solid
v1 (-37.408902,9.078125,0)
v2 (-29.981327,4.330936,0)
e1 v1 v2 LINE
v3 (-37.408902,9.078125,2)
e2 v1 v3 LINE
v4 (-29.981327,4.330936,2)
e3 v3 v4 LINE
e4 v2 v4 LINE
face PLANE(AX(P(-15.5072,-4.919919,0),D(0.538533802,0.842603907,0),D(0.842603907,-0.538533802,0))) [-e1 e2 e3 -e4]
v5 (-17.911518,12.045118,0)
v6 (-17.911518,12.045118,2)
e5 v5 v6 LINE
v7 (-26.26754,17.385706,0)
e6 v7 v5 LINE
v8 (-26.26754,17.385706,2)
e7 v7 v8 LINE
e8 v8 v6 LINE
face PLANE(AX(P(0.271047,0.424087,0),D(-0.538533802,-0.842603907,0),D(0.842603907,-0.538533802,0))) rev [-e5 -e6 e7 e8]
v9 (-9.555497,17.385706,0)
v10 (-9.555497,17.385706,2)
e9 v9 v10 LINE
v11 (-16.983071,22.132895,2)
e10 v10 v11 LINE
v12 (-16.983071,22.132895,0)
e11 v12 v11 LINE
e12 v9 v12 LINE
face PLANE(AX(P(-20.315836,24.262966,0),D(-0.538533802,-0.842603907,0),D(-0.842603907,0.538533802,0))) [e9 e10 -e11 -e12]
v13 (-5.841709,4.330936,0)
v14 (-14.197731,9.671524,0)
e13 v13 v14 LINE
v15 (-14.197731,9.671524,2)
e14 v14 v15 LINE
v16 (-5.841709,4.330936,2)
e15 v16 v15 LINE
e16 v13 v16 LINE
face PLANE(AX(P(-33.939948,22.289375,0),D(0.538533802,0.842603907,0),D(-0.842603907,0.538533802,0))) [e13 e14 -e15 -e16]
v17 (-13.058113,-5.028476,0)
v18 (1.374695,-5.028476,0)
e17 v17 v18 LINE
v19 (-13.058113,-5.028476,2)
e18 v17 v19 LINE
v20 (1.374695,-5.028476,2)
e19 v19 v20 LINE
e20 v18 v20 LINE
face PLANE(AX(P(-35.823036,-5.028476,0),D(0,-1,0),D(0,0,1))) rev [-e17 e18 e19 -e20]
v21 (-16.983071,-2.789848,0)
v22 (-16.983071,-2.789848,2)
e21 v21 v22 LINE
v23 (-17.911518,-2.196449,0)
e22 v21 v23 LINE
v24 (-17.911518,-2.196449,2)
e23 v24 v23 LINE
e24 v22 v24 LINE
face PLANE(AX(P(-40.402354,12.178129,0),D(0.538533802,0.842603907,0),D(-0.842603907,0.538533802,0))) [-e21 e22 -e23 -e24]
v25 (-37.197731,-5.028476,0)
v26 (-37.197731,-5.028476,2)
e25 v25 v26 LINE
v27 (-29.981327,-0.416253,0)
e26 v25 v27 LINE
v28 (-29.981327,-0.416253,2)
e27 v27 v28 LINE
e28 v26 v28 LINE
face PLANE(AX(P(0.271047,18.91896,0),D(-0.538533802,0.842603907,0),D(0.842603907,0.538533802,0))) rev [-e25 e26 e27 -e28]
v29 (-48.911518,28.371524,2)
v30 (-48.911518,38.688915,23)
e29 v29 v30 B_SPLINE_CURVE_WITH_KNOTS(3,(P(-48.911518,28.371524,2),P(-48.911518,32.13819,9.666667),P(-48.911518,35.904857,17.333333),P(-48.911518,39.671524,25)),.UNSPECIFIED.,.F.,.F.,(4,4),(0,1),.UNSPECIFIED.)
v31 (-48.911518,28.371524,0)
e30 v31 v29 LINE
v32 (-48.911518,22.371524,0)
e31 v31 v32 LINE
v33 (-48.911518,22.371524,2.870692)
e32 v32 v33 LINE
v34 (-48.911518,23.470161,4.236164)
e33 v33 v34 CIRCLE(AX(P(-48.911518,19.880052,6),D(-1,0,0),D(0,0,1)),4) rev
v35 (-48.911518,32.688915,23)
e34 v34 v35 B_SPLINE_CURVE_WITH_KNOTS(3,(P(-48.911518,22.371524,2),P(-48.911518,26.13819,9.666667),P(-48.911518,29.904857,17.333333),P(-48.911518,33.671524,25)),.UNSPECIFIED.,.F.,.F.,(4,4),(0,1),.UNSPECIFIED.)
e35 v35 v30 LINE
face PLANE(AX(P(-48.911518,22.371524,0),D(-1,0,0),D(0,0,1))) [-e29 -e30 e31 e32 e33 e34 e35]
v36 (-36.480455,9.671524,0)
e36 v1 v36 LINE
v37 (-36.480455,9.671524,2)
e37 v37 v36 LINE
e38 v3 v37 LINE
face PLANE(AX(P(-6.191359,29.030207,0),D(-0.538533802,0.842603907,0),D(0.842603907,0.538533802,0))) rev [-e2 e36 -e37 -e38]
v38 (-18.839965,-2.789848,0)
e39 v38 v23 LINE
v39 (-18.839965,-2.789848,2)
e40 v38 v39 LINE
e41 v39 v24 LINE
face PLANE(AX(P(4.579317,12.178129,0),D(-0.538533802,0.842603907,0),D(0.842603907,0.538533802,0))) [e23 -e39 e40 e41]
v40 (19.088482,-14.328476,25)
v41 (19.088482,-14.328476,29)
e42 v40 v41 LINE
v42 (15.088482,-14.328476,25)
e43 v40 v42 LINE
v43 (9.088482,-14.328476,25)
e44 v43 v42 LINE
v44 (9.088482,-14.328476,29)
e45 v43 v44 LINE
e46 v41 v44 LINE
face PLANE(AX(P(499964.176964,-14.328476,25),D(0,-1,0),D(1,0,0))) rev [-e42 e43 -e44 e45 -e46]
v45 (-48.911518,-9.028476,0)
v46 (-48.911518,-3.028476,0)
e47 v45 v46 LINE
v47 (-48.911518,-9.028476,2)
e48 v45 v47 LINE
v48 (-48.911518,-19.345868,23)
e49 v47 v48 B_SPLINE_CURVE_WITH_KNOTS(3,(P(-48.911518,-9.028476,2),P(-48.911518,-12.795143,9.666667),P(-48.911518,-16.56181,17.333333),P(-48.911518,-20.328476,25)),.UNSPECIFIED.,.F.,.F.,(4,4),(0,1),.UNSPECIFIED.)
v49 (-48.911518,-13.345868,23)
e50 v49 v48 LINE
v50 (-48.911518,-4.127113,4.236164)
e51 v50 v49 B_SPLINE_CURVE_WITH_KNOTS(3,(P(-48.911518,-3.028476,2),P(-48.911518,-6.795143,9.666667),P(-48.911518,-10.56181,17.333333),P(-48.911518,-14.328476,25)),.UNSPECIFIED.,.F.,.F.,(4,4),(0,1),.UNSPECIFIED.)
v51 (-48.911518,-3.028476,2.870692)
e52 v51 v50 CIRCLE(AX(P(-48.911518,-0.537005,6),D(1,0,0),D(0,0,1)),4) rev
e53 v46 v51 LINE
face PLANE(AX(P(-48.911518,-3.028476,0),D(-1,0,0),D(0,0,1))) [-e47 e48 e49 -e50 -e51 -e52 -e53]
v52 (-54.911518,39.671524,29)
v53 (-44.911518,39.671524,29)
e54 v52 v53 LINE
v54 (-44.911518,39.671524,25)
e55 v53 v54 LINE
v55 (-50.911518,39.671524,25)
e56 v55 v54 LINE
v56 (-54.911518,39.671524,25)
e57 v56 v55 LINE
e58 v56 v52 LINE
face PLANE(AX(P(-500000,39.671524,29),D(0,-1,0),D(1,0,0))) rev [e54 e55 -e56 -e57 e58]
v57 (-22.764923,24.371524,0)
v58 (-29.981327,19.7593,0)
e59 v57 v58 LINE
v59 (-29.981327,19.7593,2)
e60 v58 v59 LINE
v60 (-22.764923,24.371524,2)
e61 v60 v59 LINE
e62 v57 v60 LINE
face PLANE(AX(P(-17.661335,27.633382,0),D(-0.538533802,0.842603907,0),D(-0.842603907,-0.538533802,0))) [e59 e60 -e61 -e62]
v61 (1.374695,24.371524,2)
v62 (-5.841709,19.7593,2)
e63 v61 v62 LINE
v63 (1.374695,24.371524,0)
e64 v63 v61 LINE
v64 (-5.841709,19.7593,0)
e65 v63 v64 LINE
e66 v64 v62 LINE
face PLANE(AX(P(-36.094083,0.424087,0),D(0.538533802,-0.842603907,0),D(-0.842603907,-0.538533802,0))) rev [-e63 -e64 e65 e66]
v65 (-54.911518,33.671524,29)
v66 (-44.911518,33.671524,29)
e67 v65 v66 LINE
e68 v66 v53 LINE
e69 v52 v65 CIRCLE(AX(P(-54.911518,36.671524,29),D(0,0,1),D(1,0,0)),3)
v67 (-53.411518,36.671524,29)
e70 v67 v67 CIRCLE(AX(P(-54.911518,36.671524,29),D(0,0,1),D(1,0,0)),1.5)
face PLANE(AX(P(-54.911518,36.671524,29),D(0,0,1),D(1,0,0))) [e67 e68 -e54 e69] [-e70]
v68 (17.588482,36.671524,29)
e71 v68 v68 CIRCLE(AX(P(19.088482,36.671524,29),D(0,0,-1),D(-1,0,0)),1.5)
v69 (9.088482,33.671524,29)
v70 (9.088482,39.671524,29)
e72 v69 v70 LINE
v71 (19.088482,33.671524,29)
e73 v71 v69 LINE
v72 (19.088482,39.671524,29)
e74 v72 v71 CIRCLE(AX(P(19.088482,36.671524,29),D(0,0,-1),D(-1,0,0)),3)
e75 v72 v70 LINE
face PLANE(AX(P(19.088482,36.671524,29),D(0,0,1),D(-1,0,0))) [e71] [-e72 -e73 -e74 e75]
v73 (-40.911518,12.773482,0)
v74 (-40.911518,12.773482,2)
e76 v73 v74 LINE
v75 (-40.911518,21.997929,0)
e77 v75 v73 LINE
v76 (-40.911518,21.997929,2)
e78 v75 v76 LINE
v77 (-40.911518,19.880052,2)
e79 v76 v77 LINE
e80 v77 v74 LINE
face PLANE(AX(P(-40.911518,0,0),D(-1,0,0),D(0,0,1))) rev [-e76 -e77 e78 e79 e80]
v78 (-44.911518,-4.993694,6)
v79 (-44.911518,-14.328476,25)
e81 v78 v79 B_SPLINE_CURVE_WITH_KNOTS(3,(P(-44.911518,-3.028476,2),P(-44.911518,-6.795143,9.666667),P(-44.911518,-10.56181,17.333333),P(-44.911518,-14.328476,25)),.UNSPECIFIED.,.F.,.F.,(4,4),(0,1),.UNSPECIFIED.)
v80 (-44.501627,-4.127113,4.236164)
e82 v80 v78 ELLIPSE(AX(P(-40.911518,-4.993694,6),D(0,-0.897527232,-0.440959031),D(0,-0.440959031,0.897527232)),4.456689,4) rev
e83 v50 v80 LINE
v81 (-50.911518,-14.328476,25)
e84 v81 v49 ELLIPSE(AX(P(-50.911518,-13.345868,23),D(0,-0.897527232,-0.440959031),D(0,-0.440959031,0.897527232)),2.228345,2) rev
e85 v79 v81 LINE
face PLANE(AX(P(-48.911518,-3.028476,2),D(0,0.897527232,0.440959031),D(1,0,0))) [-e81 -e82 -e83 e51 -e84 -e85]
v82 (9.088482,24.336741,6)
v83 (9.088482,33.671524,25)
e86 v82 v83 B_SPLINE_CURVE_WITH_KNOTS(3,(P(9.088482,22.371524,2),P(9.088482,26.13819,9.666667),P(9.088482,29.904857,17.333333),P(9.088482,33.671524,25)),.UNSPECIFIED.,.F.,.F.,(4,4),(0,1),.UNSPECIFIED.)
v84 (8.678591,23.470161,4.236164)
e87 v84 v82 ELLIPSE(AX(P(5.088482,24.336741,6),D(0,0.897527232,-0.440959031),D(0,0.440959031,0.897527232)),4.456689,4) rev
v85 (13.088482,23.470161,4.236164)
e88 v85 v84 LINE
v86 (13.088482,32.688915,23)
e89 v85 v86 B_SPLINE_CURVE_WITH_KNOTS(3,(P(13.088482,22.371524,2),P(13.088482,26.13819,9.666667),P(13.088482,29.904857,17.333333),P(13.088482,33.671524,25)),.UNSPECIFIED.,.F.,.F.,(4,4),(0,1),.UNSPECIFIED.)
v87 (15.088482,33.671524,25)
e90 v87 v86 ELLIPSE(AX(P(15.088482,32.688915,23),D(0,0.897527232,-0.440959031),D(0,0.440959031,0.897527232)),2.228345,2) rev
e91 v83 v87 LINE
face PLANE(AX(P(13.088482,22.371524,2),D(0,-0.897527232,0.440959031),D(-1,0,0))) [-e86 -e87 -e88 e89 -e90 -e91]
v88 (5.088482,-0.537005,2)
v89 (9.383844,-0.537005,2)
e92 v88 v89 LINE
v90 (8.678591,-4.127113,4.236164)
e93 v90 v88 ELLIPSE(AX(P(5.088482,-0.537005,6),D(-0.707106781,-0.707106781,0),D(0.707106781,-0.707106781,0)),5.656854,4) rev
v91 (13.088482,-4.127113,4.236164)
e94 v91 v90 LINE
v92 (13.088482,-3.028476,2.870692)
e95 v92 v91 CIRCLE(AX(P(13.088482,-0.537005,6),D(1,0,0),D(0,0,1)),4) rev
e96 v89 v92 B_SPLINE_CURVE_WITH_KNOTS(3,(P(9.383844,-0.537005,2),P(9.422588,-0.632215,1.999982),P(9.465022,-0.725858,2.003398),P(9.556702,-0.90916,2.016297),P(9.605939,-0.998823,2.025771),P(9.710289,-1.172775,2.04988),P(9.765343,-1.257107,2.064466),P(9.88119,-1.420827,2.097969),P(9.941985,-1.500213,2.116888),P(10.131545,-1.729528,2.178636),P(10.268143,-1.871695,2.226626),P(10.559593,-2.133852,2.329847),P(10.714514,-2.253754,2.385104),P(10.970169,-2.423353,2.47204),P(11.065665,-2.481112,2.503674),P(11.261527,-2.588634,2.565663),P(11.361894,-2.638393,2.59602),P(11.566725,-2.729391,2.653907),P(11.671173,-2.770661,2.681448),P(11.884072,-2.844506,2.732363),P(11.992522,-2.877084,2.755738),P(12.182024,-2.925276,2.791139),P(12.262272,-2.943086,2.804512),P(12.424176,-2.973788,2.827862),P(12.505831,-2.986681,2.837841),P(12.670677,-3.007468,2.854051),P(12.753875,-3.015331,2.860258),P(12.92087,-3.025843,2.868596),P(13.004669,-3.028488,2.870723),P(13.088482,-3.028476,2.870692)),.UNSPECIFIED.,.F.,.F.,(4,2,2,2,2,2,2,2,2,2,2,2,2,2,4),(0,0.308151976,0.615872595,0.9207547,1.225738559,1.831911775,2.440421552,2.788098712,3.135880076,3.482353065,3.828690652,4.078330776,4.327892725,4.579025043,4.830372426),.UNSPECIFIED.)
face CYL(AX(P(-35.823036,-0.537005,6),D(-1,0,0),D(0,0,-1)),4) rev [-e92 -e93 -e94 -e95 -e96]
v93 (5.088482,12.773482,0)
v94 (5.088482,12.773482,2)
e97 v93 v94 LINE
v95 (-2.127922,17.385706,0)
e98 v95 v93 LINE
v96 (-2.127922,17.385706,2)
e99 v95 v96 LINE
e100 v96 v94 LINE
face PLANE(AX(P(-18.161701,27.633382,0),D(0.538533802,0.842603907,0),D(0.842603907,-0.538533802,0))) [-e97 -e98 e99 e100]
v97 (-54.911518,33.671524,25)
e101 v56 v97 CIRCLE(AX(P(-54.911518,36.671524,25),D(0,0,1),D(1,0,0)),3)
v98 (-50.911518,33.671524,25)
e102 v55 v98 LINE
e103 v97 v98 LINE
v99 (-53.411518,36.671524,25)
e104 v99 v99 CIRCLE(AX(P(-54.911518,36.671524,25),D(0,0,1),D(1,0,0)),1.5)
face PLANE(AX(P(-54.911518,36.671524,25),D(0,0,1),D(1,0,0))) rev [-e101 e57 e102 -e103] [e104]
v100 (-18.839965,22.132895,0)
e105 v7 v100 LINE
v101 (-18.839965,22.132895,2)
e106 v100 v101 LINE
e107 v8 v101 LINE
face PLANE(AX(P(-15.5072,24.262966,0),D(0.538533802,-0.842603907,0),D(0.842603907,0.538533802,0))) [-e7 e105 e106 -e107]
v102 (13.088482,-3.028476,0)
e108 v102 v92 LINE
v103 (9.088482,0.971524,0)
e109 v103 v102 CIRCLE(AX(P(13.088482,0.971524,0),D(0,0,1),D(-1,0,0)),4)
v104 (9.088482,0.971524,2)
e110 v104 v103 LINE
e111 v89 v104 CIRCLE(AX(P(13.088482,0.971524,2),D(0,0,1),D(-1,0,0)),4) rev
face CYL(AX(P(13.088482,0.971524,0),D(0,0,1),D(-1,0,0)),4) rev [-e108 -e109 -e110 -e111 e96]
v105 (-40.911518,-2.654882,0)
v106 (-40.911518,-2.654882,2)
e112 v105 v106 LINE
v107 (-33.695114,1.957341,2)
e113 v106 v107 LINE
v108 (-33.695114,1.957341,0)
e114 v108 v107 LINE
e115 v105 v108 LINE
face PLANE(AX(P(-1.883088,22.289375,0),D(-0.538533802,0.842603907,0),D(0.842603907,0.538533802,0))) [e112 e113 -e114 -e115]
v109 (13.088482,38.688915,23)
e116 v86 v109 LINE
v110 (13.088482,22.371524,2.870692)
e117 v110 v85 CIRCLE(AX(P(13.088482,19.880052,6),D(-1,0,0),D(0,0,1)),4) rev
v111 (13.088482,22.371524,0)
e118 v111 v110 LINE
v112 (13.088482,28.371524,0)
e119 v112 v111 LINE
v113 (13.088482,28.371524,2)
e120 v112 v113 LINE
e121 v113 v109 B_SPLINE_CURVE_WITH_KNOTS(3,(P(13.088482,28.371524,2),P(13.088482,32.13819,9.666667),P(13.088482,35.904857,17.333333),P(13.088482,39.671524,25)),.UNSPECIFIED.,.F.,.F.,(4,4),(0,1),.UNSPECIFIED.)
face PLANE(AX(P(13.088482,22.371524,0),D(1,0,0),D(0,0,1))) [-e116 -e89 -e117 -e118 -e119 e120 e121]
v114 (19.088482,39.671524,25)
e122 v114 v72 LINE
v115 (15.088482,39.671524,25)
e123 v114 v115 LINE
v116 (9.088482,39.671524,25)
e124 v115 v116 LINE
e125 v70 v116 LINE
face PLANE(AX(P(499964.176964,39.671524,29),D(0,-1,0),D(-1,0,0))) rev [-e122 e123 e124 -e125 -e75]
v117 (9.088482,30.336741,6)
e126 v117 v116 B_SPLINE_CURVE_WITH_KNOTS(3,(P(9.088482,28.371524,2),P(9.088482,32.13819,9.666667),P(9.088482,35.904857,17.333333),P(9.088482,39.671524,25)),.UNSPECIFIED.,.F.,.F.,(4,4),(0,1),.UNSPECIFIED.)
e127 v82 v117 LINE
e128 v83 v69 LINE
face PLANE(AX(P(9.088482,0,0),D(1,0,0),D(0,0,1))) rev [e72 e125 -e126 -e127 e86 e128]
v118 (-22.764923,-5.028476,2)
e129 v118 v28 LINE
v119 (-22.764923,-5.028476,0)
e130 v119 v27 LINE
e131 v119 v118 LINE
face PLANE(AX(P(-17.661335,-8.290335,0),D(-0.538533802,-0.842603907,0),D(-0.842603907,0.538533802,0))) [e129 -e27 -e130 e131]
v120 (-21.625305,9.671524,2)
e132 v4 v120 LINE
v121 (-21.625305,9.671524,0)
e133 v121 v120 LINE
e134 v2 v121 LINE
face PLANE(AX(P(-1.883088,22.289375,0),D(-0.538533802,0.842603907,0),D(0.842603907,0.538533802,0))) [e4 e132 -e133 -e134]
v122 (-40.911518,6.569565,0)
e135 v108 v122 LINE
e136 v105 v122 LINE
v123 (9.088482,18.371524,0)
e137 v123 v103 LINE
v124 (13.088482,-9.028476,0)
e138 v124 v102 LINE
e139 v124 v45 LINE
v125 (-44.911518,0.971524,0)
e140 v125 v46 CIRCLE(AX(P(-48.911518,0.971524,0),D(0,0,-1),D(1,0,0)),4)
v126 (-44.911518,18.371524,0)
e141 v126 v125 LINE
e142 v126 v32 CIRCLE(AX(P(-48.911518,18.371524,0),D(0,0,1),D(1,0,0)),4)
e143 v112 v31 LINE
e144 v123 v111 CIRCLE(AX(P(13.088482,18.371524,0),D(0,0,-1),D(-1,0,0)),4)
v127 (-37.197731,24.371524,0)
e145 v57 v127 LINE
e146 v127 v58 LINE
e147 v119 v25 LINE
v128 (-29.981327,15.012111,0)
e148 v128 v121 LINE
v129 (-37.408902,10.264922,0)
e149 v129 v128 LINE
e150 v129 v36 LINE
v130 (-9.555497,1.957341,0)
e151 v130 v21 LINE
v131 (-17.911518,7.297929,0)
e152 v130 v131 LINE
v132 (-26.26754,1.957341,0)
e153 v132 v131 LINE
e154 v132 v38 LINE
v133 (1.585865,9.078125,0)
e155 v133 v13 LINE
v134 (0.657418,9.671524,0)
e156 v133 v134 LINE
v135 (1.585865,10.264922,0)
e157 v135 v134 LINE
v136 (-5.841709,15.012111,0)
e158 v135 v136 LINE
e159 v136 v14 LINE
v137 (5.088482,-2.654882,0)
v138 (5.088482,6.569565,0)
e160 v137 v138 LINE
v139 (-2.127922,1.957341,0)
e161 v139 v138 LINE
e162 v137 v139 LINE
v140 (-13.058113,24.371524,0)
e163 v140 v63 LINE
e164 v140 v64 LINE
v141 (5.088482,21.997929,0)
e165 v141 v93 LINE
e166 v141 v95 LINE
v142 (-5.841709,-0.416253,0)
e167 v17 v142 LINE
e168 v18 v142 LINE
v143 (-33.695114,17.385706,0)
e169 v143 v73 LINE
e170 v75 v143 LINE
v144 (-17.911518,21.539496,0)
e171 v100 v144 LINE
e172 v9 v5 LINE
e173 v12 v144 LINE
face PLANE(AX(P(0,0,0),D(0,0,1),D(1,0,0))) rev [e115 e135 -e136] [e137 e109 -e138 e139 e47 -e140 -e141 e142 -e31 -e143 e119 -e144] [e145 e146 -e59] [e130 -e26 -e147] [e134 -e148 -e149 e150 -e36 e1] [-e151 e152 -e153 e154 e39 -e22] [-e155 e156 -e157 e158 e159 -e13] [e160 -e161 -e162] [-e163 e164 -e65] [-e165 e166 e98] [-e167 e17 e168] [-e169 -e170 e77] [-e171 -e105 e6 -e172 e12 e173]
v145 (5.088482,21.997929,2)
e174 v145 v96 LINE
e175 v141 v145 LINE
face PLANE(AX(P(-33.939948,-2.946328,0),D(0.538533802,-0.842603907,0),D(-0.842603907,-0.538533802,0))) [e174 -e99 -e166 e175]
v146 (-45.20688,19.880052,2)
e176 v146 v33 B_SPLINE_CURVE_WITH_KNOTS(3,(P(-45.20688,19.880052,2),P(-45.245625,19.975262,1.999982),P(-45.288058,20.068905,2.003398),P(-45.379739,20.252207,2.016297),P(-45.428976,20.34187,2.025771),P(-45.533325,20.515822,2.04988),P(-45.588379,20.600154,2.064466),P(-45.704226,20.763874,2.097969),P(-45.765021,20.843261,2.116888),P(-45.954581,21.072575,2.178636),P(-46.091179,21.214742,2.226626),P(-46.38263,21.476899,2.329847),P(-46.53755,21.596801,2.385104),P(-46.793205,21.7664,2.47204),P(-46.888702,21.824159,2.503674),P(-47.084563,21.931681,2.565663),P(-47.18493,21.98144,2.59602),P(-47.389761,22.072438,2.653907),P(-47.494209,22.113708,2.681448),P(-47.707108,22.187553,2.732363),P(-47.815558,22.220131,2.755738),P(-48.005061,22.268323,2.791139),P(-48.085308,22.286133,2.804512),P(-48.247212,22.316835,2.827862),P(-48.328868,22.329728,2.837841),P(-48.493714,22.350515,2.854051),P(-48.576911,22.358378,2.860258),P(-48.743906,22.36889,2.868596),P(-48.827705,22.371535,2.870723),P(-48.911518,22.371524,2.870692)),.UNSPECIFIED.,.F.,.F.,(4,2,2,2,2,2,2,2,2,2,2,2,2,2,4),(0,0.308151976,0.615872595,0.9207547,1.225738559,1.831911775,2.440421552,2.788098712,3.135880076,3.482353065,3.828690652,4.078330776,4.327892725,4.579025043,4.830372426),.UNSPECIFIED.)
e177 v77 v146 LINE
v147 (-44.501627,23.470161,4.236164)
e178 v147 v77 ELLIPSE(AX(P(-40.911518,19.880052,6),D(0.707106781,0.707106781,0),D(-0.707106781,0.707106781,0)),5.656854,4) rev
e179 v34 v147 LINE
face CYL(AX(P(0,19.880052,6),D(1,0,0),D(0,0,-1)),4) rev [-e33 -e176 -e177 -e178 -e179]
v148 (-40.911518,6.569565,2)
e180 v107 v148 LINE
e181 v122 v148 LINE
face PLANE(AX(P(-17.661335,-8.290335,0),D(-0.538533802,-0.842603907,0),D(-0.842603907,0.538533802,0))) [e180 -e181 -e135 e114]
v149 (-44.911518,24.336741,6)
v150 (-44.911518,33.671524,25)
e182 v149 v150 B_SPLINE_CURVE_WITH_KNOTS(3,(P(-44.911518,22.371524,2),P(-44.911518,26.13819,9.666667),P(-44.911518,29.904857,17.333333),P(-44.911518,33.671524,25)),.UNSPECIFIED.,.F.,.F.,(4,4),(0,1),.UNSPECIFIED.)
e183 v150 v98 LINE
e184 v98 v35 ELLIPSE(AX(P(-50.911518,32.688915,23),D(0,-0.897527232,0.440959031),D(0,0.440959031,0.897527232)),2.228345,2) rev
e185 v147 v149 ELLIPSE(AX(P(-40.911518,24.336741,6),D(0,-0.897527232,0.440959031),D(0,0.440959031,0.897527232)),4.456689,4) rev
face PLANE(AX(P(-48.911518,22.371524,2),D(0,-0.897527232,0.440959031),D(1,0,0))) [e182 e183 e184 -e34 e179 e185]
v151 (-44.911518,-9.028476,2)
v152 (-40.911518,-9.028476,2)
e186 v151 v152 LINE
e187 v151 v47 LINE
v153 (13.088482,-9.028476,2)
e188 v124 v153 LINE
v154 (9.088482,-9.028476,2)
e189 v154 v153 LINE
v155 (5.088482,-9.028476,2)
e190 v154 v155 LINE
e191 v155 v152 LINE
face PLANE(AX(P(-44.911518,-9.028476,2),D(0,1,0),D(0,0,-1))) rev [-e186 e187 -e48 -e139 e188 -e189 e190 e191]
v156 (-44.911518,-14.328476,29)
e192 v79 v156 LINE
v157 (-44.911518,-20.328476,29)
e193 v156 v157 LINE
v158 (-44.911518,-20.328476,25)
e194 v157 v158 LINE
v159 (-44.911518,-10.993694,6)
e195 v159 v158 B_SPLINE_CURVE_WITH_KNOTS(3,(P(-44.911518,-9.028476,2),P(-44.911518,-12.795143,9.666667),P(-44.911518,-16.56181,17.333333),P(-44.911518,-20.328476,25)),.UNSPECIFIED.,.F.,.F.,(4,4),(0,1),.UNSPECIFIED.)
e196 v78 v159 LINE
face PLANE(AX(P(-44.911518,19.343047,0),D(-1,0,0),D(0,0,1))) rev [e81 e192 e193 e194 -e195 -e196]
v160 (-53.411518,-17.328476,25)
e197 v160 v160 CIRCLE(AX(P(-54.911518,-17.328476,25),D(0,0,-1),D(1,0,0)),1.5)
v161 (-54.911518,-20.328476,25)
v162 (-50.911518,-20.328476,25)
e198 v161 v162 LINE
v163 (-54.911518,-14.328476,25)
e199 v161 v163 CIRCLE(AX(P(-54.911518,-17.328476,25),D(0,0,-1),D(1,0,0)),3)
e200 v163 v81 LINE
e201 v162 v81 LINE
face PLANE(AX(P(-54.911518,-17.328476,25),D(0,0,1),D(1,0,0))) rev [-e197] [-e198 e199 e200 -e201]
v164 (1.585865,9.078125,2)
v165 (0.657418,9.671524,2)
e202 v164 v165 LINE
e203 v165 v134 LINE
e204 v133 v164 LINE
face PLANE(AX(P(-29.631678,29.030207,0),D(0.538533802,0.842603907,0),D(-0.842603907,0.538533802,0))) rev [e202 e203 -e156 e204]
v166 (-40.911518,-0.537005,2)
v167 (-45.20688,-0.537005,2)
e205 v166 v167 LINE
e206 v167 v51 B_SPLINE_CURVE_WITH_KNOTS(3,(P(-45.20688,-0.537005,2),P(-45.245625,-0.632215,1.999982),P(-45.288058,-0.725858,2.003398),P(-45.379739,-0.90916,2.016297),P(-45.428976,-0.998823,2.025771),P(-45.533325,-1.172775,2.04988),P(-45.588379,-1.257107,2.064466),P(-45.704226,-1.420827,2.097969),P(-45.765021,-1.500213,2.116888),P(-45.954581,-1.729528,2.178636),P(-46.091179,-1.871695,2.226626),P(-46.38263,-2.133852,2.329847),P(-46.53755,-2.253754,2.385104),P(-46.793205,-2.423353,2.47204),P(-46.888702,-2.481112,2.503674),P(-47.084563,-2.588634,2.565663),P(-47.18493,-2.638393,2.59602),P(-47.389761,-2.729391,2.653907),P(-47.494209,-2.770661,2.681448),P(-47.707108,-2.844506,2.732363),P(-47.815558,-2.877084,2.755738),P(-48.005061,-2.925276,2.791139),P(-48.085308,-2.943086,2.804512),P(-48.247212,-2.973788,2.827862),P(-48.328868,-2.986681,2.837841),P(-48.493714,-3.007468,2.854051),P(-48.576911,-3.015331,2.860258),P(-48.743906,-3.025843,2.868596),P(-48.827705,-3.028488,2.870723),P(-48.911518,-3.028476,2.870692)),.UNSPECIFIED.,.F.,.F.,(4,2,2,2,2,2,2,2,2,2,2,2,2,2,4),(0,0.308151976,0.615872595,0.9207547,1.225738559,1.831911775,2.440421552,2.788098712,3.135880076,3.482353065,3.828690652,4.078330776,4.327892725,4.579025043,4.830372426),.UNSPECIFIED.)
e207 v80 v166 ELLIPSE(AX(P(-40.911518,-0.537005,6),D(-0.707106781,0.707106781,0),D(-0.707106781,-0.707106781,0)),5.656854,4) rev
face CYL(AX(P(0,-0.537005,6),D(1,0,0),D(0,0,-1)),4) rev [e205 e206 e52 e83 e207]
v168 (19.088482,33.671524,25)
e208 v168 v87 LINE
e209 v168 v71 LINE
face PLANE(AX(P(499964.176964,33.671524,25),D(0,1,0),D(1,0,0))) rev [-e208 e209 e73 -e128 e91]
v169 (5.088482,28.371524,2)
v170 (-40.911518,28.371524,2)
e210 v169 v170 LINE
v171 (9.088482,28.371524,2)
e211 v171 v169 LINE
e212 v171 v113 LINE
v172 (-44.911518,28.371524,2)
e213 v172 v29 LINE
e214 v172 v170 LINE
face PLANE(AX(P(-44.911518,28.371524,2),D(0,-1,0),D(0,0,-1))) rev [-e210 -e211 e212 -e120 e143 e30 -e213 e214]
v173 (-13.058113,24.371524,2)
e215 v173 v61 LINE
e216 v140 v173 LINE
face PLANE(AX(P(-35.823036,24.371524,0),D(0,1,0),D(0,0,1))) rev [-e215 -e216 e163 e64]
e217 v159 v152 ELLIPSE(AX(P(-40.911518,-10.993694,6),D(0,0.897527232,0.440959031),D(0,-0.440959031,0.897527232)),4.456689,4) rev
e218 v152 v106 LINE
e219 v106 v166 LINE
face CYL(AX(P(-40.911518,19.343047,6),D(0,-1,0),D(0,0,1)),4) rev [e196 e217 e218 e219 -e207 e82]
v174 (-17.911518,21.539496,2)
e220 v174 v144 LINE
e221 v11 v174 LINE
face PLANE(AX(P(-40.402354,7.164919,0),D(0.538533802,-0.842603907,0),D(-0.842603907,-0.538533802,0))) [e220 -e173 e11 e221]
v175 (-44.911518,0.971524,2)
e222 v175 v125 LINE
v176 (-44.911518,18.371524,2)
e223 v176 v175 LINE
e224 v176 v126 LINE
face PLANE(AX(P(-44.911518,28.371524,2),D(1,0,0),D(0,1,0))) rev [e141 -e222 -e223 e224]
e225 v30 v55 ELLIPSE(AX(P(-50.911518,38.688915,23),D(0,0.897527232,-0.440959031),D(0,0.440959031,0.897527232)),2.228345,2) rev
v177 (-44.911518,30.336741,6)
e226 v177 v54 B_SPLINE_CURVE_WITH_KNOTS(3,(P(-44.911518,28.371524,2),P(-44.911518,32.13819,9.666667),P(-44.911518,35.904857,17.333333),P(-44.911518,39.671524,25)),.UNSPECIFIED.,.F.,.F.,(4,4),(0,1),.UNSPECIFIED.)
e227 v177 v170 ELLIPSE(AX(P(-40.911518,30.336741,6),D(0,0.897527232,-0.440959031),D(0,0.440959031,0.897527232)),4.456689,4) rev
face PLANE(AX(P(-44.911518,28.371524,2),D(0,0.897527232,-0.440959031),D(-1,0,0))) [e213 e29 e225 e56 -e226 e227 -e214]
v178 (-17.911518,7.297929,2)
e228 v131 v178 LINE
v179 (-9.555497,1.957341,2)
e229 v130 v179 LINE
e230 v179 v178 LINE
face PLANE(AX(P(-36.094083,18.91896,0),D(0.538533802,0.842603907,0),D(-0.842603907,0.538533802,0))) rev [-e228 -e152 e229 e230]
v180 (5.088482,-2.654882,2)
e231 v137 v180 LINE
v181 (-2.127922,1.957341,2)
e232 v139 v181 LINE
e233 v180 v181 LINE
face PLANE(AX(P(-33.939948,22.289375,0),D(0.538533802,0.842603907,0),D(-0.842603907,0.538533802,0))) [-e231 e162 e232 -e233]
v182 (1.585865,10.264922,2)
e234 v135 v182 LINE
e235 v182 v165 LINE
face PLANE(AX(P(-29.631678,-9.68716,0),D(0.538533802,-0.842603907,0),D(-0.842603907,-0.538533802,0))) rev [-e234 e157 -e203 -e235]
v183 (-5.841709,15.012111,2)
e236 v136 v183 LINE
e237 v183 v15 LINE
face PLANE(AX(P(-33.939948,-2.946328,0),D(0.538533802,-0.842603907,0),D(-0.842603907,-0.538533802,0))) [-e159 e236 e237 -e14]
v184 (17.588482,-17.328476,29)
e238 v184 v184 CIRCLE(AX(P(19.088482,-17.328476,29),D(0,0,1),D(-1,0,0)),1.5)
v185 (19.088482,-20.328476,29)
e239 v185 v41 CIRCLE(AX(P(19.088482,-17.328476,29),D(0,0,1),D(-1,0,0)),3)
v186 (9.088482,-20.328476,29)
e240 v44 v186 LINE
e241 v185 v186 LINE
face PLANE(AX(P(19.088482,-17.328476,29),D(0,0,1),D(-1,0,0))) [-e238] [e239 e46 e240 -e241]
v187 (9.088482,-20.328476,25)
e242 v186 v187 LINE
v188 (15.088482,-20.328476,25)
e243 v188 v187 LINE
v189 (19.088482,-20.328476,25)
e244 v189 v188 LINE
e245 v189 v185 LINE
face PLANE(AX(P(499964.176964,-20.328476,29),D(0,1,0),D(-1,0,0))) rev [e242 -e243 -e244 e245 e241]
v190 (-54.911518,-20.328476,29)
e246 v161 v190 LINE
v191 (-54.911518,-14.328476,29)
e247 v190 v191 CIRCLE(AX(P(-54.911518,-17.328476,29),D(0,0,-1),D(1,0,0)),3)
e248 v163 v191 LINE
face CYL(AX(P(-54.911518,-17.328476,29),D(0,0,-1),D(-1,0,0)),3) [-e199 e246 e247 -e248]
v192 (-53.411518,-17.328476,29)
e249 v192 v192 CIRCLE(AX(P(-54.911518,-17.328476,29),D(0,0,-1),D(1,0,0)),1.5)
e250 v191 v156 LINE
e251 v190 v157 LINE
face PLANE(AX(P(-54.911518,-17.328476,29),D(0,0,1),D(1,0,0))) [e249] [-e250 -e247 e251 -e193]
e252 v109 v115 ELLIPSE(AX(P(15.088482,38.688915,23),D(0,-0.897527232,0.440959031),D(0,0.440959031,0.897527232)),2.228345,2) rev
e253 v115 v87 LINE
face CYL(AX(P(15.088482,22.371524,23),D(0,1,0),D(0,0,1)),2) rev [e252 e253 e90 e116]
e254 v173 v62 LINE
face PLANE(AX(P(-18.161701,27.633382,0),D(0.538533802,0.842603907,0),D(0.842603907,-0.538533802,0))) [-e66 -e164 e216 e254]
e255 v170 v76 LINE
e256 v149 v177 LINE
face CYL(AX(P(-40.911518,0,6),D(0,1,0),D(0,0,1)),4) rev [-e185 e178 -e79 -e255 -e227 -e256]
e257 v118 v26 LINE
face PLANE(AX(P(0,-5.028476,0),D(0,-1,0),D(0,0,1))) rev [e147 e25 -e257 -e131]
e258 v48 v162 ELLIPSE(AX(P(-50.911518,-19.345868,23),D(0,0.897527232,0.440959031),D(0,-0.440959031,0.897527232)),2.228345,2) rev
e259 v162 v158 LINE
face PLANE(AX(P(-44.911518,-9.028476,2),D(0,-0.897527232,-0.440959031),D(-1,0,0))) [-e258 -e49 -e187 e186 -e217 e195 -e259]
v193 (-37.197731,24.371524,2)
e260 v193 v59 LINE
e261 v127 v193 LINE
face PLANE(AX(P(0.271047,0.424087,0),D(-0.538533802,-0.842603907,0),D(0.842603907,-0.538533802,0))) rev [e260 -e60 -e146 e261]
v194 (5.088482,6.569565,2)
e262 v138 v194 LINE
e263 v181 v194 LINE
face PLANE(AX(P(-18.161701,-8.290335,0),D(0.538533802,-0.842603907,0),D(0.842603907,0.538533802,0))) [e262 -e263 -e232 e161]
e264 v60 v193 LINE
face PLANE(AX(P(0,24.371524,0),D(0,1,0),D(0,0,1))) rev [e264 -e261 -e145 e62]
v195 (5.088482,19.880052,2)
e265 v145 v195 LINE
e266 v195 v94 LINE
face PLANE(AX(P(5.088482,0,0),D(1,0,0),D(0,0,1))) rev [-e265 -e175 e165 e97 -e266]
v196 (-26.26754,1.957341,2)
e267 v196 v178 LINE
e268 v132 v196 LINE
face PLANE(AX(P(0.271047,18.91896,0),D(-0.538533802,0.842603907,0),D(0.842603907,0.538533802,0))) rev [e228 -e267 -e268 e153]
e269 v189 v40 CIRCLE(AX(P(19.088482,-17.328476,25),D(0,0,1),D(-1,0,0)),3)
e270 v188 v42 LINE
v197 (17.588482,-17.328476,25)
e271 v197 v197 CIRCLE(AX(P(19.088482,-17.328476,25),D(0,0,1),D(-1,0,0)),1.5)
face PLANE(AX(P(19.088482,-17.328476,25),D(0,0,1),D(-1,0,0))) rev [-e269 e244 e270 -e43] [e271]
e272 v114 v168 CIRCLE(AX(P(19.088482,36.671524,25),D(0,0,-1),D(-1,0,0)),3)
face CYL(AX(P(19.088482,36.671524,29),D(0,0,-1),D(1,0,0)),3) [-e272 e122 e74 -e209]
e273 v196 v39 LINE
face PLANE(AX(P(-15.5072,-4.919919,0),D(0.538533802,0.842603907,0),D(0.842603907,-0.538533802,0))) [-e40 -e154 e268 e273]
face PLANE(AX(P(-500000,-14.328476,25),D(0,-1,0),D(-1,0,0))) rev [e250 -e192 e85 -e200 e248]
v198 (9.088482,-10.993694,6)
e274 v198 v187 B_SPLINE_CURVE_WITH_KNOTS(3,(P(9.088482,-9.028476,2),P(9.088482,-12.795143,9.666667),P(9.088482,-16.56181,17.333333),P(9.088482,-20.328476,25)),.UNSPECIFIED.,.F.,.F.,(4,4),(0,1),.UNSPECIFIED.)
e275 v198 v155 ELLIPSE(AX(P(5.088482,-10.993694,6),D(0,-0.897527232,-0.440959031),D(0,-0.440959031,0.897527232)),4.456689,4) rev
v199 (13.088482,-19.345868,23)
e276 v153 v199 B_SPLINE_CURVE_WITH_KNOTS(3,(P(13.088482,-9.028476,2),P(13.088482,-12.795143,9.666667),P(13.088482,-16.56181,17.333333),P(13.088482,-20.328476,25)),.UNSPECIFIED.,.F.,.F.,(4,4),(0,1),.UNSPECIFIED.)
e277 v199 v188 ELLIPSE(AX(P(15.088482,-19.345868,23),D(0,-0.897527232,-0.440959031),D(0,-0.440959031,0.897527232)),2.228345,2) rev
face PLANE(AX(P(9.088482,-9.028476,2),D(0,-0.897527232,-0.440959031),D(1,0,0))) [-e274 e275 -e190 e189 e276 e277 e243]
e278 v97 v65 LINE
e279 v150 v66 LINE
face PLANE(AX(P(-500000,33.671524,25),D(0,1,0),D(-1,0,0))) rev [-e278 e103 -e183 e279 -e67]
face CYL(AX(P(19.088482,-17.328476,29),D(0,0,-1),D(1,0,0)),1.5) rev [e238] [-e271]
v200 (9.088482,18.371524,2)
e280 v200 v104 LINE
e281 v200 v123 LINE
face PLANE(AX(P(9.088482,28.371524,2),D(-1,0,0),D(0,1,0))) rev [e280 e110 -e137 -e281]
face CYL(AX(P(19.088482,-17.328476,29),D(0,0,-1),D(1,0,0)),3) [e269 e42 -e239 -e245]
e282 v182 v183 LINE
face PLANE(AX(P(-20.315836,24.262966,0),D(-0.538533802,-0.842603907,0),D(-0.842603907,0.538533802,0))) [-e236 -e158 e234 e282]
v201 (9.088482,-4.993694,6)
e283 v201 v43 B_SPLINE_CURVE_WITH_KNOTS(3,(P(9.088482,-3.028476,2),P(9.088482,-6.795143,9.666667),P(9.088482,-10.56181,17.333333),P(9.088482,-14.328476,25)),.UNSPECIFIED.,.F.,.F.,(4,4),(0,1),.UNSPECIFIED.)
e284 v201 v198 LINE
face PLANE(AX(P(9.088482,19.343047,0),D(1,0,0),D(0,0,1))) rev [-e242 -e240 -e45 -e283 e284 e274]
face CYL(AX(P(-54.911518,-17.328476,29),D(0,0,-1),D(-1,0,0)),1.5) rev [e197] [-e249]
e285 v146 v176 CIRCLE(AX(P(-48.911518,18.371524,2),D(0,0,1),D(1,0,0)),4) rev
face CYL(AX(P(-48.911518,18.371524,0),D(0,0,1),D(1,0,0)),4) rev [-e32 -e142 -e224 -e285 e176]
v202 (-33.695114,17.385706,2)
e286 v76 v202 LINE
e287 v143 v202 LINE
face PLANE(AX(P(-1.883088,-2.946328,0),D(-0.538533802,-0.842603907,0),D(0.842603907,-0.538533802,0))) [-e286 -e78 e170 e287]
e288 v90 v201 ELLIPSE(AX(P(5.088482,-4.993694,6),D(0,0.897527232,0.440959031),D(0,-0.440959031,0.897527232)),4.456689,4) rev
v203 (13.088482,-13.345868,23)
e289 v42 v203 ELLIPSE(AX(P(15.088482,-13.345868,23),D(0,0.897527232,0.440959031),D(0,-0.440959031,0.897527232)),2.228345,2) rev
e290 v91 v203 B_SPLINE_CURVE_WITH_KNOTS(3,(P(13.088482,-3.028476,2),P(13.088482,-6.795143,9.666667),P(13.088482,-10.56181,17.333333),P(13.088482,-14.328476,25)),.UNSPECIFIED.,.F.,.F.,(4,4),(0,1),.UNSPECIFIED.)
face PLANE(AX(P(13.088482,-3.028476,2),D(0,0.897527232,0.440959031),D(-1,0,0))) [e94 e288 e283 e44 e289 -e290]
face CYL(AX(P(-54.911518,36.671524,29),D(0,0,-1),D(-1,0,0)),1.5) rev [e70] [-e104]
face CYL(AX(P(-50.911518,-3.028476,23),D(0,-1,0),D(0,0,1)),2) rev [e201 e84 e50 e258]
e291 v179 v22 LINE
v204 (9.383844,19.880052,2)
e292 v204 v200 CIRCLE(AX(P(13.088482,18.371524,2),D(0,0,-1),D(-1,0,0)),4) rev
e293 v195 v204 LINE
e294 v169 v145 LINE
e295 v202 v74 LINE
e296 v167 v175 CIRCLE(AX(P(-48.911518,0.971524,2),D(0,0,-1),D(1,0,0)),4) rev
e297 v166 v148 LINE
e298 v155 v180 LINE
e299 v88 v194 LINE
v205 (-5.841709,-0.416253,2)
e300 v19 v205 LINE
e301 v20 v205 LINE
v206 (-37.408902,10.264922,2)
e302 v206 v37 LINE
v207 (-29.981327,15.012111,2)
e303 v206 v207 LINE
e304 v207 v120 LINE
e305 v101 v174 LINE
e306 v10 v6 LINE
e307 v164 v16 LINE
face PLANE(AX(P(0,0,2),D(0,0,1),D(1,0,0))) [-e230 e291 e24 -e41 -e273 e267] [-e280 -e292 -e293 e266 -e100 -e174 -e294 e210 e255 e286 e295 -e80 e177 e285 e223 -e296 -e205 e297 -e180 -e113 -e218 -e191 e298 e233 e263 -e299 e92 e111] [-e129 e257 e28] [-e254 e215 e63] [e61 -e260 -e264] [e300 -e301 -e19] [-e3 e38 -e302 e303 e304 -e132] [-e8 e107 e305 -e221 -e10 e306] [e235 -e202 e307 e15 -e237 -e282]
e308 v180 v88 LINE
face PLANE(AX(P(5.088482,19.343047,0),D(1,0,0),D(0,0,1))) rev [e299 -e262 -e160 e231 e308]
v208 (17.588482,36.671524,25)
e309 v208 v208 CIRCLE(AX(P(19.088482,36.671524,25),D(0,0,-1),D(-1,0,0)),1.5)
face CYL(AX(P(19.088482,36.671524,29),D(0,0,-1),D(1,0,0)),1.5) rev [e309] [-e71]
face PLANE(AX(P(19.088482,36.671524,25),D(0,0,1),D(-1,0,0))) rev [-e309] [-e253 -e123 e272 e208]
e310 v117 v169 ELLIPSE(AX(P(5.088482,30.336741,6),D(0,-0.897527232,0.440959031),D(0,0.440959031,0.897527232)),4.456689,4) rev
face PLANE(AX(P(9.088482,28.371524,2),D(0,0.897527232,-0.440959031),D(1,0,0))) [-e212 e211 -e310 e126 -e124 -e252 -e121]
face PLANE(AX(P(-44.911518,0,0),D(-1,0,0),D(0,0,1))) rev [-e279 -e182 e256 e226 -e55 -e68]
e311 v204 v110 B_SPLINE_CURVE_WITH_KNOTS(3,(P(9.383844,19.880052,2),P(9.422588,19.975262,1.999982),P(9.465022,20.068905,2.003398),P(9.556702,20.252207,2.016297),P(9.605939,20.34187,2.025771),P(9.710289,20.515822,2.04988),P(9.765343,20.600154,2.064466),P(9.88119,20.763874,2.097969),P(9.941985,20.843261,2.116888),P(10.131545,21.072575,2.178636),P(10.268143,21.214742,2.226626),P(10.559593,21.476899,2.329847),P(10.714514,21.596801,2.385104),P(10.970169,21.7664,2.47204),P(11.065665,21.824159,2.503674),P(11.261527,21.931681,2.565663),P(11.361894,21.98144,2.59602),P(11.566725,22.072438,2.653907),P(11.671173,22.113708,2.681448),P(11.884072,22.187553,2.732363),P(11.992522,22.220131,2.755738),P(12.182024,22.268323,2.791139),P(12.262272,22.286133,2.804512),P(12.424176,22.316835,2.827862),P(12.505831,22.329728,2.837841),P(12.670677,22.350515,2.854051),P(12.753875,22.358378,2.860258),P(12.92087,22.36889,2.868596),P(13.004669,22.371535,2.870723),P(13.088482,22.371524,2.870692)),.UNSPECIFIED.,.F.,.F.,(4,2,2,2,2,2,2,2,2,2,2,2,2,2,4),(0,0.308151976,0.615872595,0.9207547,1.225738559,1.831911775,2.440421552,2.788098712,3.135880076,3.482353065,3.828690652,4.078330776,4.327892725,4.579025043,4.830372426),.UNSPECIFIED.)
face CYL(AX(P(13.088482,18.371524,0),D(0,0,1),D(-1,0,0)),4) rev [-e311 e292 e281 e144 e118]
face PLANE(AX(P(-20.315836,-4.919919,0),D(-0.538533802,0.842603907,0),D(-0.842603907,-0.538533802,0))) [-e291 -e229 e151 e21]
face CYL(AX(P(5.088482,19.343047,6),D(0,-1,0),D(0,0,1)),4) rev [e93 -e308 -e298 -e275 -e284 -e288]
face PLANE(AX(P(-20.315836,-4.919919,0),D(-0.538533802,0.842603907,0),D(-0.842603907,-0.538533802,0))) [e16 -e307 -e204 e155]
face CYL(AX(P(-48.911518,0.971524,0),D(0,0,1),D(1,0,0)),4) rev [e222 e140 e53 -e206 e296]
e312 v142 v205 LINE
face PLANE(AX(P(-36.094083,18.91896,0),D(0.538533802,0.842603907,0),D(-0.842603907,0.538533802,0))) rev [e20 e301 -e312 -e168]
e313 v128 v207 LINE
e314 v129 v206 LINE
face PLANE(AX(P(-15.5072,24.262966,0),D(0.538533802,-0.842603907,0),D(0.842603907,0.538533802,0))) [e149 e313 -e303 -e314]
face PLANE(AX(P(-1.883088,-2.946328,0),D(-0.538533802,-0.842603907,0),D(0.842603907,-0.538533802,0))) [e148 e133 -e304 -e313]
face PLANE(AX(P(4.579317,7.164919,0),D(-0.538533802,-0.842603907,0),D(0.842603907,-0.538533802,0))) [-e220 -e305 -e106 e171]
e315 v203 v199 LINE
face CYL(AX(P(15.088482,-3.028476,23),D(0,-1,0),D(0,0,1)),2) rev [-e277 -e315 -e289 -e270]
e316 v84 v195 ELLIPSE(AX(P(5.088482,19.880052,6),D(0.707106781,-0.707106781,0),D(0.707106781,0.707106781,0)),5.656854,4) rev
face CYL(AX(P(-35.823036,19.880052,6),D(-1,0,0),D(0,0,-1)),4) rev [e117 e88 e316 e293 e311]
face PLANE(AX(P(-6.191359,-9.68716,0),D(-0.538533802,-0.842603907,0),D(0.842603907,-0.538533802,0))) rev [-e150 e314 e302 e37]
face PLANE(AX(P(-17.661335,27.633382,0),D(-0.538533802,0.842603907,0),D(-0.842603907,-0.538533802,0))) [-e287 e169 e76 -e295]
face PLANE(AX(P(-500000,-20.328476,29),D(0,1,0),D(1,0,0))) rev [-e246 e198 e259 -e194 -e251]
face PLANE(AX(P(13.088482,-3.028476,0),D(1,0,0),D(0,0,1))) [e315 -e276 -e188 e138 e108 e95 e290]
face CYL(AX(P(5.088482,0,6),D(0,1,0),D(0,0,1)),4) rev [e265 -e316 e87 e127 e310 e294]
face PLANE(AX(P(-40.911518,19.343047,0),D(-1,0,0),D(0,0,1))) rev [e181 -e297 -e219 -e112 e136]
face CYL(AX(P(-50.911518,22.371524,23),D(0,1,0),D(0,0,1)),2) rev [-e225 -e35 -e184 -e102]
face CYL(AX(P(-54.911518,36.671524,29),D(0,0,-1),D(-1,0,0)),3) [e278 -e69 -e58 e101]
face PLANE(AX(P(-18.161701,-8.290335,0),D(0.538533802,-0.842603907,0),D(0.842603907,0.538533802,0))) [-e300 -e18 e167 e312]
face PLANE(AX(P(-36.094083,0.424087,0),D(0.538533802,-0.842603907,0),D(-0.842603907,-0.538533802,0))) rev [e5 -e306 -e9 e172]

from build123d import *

# Parameters (mm, degrees)
SKETCH1_W                = 54
SKETCH1_H                = 37.4
BOSS_EXTRUDE1_DEPTH      = 2
CUT_EXTRUDE1_DEPTH       = 54.160020758
SKETCH4_R                = 3
SKETCH4_R_2              = 1.5
BOSS_EXTRUDE2_DEPTH      = 4
BOSS_EXTRUDE3_REACH      = 75.013
BOSS_EXTRUDE3_END_RADIUS = 3
SKETCH6_W                = 4
SKETCH6_H                = 6
LOFT1_START              = -48.911518112
LOFT1_DEPTH              = 4
SKETCH8_2_W              = 4
SKETCH8_2_H              = 6
BOSS_EXTRUDE4_DEPTH      = 2
FILLET5_R                = 2
FILLET1_R                = 4
FILLET2_R                = 4
FILLET3_R                = 4
INTERSECT1_START         = -9.028476462
INTERSECT1_OUTLINE_W     = 54
INTERSECT1_OUTLINE_H     = 2
INTERSECT1_DEPTH         = 18.7
INTERSECT2_START         = -17.911518112
INTERSECT2_OUTLINE_W     = 18.7
INTERSECT2_OUTLINE_H     = 2
INTERSECT2_DEPTH         = 27


# Read off the part's stored shape, not the designer's step: Loft1, Intersect1, Intersect2
with BuildPart() as part:
    # Sketch1 → Boss-Extrude1 (new body)
    with BuildSketch(Plane.XY):
        with Locations((-17.911518112, 9.671523538)):
            Rectangle(SKETCH1_W, SKETCH1_H)
    extrude(amount=BOSS_EXTRUDE1_DEPTH)

    # Sketch2 → Cut-Extrude1 (cut, through all)
    with BuildSketch(Plane.XY.offset(2)):
        Polygon((-22.764922959, 24.371523538), (-29.981326879, 19.759300163), (-37.197730799, 24.371523538), align=None)
        Polygon((-33.695114192, 17.385705663), (-40.911518112, 12.773482289), (-40.911518112, 21.997929038), align=None)
        Polygon((-29.981326879, 15.012111163), (-37.408901505, 10.264922163), (-29.052880051, 4.924334538), (-21.625305425, 9.671523538), align=None)
        Polygon((-18.83996494, 22.132894663), (-26.267539566, 17.385705663), (-17.911518112, 12.045118038), (-10.483943486, 16.792307038), align=None)
        Polygon((1.374694575, 24.371523538), (-14.915006921, 24.371523538), (-6.770156173, 19.165901538), align=None)
        Polygon((-3.05636886, 16.792307038), (5.088481888, 11.586685039), (5.088481888, 21.997929038), align=None)
        Polygon((-6.770156173, 14.418712538), (-14.197730799, 9.671523538), (-5.841709344, 4.330935913), (1.585865282, 9.078124913), align=None)
        Polygon((-17.911518112, 7.297929038), (-25.339092738, 2.550740038), (-16.983071283, -2.789847587), (-9.555496657, 1.957341413), align=None)
        Polygon((-29.052880051, 0.177145538), (-20.908029303, -5.028476462), (-37.197730799, -5.028476462), align=None)
        Polygon((-40.911518112, 7.756362038), (-32.766667364, 2.550740038), (-40.911518112, -2.654881962), align=None)
        Polygon((-13.058113264, -5.028476462), (-5.841709344, -0.416253087), (1.374694575, -5.028476462), align=None)
        Polygon((-2.127922031, 1.957341413), (5.088481888, 6.569564788), (5.088481888, -2.654881962), align=None)
    extrude(amount=-CUT_EXTRUDE1_DEPTH, mode=Mode.SUBTRACT)



with BuildPart() as body_2:
    # Sketch4 → Boss-Extrude2 (new body)
    with BuildSketch(Plane.XY.offset(25)):
        with Locations((-54.911518112, 36.671523538)):
            Circle(SKETCH4_R)
        with Locations((-54.911518112, 36.671523538)):
            Circle(SKETCH4_R_2, mode=Mode.SUBTRACT)
    extrude(amount=BOSS_EXTRUDE2_DEPTH)

    # Boss-Extrude3: up to this cylinder (the profile starts outside it)
    boss_extrude3_end = Plane(origin=(-54.911518112, 36.671523538, 27), z_dir=(0, 0, -1)) * Cylinder(BOSS_EXTRUDE3_END_RADIUS, 157.026, mode=Mode.PRIVATE)
    # Sketch6 → Boss-Extrude3 (add, up to the surface)
    with BuildSketch(Plane.ZY.offset(44.911518112), mode=Mode.PRIVATE) as boss_extrude3_sk1:
        with Locations((27, 36.671523538)):
            Rectangle(SKETCH6_W, SKETCH6_H)
    boss_extrude3_tool1 = extrude(boss_extrude3_sk1.sketch, amount=BOSS_EXTRUDE3_REACH, mode=Mode.PRIVATE) - boss_extrude3_end
    add(boss_extrude3_tool1.solids().sort_by_distance((-44.911518, 36.671524, 27))[0])

    # Loft1 outline → Loft1 (add)
    with BuildSketch(Plane.YZ.offset(LOFT1_START)):
        Polygon((22.371523538, 2), (28.371523538, 2), (39.671523538, 25), (33.671523538, 25), align=None)
    extrude(amount=LOFT1_DEPTH)


with BuildPart() as part_1:
    add(part.part)

    add(body_2.part)  # Boss-Extrude4 merges body 2
    # Sketch8<2> → Boss-Extrude4 (add)
    with BuildSketch(Plane.XY.offset(2)):
        with Locations((-46.911518112, 25.371523538)):
            Rectangle(SKETCH8_2_W, SKETCH8_2_H)
    extrude(amount=-BOSS_EXTRUDE4_DEPTH)

    # Fillet5
    fillet5_edges = [part_1.edges().sort_by_distance(p)[0] for p in [
        (-48.911518112, 36.671523538, 25),
    ]]
    fillet(fillet5_edges, radius=FILLET5_R)

    # Fillet1
    # the kernel refuses this fillet: 4 mm, written as the material it adds along each edge
    with BuildSketch(Plane(origin=(-44.911518112, 22.371523538, 2), x_dir=(-1, 0, 0), z_dir=(0, 0, -1))) as fillet1_piece_1:
        with BuildLine():
            CenterArc((FILLET1_R, -FILLET1_R), FILLET1_R, 90, 90)
            Line((0, -FILLET1_R), (0, 0))
            Line((0, 0), (FILLET1_R, 0))
        make_face()
    extrude(amount=2)

    # Fillet2
    fillet2_edges = [part_1.edges().sort_by_distance(p)[0] for p in [
        (-44.911518112, 25.371523538, 2),
    ]]
    fillet(fillet2_edges, radius=FILLET2_R)

    # Fillet3
    # the kernel refuses this fillet: 4 mm, written as the material it adds along each edge
    with BuildSketch(Plane(origin=(-40.911518112, 22.371523538, 2), x_dir=(-1.1887379968908428e-11, -1.0, 0), z_dir=(-1.0, 1.188737996890843e-11, 0))) as fillet3_piece_1_section:
        with BuildLine():
            CenterArc((FILLET3_R * 0.622867973762, FILLET3_R), FILLET3_R, 206.165087136, 63.834912864)
            Line((-FILLET3_R * 0.274659258448, FILLET3_R * 0.559040968523), (0, 0))
            Line((0, 0), (FILLET3_R * 0.622867973762, 0))
        make_face()
    fillet3_piece_1 = extrude(amount=8, mode=Mode.PRIVATE)
    fillet3_piece_1 = fillet3_piece_1 - Plane(origin=(-48.911518112, 18.371523538, 2.009489355), x_dir=(-1, 0, 0), z_dir=(0, 0, 1)) * Cylinder(4, 26, mode=Mode.PRIVATE)
    fillet3_piece_1 = fillet3_piece_1 - Plane(origin=(-40.911518112, 22.302452917, 6), x_dir=(0, 0, -1), z_dir=(0, 1, 0)) * Cylinder(4, 26, mode=Mode.PRIVATE)
    add(fillet3_piece_1)

    # Intersect1 outline → Intersect1 (cut)
    with BuildSketch(Plane(origin=(0, 0, 0), x_dir=(1, 0, 0), z_dir=(0, 1, 0)).offset(INTERSECT1_START)):
        with Locations((-17.911518112, -1)):
            Rectangle(INTERSECT1_OUTLINE_W, INTERSECT1_OUTLINE_H)
    extrude(amount=INTERSECT1_DEPTH, mode=Mode.SUBTRACT)

    # Intersect2 outline → Intersect2 (cut)
    with BuildSketch(Plane.YZ.offset(INTERSECT2_START)):
        with Locations((19.021523538, 1)):
            Rectangle(INTERSECT2_OUTLINE_W, INTERSECT2_OUTLINE_H)
    extrude(amount=INTERSECT2_DEPTH, mode=Mode.SUBTRACT)

    # Mirror3: part across plane


with BuildPart() as part_2:
    add(part_1.part)
    add(part_1.part.mirror(Plane.ZY.offset(17.911518112)))

    # Mirror4: part across plane


with BuildPart() as part_3:
    add(part_2.part)
    add(part_2.part.mirror(Plane.ZX.offset(9.671523538)))


solid = part_3.part
